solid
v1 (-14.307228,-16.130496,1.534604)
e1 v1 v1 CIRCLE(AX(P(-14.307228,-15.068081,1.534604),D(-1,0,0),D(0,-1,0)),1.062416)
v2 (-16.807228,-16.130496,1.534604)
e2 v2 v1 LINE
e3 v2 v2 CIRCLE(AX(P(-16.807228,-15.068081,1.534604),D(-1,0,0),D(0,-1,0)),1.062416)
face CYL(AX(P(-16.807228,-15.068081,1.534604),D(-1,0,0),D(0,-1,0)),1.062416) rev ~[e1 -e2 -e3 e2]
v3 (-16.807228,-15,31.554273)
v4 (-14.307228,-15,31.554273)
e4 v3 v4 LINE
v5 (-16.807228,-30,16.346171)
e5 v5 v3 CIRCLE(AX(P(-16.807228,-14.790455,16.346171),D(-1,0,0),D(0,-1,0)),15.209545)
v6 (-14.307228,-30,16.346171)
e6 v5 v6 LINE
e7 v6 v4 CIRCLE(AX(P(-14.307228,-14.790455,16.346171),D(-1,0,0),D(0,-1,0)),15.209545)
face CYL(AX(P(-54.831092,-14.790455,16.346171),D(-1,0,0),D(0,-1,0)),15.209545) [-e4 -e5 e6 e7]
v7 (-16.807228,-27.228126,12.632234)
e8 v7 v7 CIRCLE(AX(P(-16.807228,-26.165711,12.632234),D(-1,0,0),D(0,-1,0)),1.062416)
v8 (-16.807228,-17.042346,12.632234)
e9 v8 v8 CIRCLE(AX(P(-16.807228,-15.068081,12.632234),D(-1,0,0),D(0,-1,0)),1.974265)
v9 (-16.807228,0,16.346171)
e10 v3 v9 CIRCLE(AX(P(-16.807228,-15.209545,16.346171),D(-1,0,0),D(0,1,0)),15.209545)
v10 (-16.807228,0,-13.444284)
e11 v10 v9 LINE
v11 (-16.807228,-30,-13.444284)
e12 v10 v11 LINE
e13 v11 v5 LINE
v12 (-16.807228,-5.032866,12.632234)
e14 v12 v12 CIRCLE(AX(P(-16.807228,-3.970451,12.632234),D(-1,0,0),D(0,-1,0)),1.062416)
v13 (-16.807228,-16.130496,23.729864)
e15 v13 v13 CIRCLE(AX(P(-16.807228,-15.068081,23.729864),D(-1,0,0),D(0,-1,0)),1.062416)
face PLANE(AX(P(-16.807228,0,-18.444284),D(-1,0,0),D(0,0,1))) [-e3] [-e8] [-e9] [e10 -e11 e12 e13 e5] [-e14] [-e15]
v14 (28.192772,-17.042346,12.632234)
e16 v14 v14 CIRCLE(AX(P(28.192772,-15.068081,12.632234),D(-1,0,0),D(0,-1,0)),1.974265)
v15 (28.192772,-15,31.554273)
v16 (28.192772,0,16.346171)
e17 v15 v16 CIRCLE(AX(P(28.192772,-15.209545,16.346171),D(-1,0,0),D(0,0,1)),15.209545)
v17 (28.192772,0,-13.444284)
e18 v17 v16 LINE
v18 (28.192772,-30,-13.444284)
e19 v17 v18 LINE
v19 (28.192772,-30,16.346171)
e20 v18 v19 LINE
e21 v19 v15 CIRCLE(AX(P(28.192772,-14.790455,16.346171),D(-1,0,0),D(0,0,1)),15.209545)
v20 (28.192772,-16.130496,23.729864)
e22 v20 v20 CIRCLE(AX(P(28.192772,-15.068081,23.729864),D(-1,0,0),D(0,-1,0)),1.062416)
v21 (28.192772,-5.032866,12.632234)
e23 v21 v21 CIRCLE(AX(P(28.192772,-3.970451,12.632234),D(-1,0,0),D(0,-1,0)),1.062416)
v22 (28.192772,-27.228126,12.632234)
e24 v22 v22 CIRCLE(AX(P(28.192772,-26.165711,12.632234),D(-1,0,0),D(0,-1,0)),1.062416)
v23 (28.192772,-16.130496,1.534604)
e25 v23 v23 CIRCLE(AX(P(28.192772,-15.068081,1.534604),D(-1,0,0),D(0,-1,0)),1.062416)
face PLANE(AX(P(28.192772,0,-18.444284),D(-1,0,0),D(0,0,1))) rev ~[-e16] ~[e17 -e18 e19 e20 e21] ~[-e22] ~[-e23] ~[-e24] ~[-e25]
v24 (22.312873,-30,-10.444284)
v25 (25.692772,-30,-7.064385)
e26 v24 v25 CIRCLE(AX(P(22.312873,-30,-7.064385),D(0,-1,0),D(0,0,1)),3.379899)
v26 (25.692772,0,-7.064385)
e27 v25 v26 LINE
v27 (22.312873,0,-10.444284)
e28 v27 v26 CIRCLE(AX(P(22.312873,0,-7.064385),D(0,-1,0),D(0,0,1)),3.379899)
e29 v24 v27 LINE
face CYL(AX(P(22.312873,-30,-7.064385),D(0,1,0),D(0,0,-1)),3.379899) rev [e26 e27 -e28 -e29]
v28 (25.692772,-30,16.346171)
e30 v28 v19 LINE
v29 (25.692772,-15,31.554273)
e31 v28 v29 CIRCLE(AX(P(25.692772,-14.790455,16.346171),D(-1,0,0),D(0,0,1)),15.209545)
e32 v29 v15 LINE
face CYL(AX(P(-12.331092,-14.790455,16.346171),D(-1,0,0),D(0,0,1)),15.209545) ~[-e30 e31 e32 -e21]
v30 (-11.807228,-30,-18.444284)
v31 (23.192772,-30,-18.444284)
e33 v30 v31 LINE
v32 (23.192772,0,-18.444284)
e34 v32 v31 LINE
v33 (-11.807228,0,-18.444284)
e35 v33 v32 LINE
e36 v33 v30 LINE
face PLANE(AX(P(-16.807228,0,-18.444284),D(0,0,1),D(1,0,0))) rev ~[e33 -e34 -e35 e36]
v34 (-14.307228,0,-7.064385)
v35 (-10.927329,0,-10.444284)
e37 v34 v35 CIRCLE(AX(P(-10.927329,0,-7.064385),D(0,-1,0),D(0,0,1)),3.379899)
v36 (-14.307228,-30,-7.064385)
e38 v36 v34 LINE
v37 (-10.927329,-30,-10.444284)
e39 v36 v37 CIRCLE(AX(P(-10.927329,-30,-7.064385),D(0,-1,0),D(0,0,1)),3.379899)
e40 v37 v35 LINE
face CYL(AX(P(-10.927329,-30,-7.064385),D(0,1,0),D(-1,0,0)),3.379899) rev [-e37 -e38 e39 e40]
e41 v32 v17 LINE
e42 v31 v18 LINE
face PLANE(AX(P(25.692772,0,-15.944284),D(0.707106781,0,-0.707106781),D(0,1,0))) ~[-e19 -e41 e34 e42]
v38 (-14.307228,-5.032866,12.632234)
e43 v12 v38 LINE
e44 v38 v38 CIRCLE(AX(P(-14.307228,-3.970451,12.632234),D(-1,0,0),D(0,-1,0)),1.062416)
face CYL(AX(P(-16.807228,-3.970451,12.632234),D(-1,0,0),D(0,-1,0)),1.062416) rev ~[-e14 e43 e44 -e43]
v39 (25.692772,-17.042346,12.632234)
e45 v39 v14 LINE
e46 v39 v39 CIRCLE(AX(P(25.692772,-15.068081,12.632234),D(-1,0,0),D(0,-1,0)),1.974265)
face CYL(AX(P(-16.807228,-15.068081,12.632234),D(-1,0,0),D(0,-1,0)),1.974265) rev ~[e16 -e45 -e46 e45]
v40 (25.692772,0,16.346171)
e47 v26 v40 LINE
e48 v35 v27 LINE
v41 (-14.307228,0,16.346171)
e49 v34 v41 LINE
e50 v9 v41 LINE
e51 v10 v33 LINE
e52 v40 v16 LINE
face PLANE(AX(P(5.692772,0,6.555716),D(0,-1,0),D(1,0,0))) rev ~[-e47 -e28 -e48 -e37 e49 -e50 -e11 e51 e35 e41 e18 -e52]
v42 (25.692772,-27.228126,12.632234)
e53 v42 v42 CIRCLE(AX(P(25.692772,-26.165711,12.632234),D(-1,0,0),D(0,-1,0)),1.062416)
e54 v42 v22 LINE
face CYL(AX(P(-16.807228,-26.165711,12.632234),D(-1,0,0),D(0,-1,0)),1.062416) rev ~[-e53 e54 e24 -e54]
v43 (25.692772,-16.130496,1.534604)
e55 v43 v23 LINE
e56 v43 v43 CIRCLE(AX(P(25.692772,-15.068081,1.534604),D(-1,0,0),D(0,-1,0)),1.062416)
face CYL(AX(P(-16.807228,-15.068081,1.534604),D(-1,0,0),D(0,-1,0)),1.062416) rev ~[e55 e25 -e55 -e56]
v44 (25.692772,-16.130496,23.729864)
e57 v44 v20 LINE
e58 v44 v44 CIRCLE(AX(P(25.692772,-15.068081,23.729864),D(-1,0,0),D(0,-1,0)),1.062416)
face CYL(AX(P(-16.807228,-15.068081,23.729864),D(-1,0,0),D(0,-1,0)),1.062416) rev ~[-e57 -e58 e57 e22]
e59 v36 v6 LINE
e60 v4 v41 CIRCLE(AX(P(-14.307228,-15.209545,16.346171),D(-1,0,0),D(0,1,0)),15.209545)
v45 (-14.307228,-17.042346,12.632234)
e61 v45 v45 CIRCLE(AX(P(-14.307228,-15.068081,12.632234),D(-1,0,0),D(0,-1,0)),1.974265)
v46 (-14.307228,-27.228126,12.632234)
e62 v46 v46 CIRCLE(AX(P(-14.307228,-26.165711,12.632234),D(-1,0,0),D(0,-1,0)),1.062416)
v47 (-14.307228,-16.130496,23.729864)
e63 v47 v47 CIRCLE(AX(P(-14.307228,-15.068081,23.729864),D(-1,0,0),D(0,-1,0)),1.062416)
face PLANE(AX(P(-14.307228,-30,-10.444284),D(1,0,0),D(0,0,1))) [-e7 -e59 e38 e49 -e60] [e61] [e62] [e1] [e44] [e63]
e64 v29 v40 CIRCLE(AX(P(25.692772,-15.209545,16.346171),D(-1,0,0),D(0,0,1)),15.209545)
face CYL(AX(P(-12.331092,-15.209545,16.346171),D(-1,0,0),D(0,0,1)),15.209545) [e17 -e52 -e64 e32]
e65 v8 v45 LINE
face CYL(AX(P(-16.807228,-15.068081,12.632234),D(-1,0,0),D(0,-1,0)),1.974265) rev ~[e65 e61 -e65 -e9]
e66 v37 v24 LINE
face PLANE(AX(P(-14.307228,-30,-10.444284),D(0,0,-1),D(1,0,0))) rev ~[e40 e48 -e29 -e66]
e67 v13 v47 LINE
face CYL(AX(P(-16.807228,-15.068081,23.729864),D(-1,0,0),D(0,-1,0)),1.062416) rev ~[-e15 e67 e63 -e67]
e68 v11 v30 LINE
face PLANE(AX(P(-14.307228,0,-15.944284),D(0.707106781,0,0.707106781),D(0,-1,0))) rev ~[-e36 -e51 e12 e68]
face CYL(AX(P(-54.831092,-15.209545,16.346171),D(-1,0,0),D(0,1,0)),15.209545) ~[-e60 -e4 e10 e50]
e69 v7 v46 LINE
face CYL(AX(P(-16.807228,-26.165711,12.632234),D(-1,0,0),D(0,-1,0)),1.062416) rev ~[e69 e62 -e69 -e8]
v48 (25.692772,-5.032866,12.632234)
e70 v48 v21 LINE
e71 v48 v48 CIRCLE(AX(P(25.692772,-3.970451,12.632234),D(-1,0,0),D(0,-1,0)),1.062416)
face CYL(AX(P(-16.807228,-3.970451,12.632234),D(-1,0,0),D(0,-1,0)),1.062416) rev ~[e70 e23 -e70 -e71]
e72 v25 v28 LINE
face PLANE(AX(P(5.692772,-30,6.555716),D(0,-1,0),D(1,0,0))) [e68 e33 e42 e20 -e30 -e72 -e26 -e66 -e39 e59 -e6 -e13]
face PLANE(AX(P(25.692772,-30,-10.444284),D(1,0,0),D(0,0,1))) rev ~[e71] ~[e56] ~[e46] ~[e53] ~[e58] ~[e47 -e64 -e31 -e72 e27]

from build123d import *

# Parameters (mm, degrees)
F0_W        = 45
F0_H        = 50
F1_DEPTH    = 30
F2_W        = 40
F2_H        = 42
F3_DEPTH    = 30.001
F4_T1_DEPTH = 78.5477272148
F4_T3_DEPTH = 78.5477272148
F5_R        = 3.3798989873
F6_SIZE     = 5
F7_R        = 1.0624158
F7_R_2      = 1.974265
F8_DEPTH    = 45.001


# Not quite as in the source:
# - a fillet or chamfer that OpenCascade refuses, or shapes differently, is made with other operations: its cross-section is extruded or revolved along the edge and cut away or added


with BuildPart() as f1:
    # F0 (on Front) → F1 (new body)
    with BuildSketch(Plane.XZ):
        with Locations((5.6927716359, 6.5557161967)):
            Rectangle(F0_W, F0_H)
    extrude(amount=F1_DEPTH)

    # F2 (on face) → F3 (cut, through all)
    with BuildSketch(Plane.XZ.offset(30)):
        with Locations((5.6927716359, 10.5557161967)):
            Rectangle(F2_W, F2_H)
    extrude(amount=-F3_DEPTH, mode=Mode.SUBTRACT)

    # F4: fillet of radius 15.209545443 on 4 edges, made by hand

    # F4_s2 → F4_t1 (cut)
    with BuildSketch(Plane.YZ.offset(-54.8310919714)):
        with BuildLine():
            ThreePointArc((0, 16.3461707538), (-4.4547727215, 27.1009434752), (-15.209545443, 31.5557161967))
            Line((-15.209545443, 31.5557161967), (0, 31.5557161967))
            Line((0, 31.5557161967), (0, 16.3461707538))
        make_face()
        with BuildLine():
            ThreePointArc((-30, 16.3461707538), (-25.5452272785, 27.1009434752), (-14.790454557, 31.5557161967))
            Line((-14.790454557, 31.5557161967), (-30, 31.5557161967))
            Line((-30, 31.5557161967), (-30, 16.3461707538))
        make_face()
    extrude(amount=F4_T1_DEPTH, mode=Mode.SUBTRACT)

    # F4_s4 → F4_t3 (cut)
    with BuildSketch(Plane.YZ.offset(-12.3310919714)):
        with BuildLine():
            ThreePointArc((-14.790454557, 31.5557161967), (-25.5452272785, 27.1009434752), (-30, 16.3461707538))
            Line((-30, 16.3461707538), (-30, 31.5557161967))
            Line((-30, 31.5557161967), (-14.790454557, 31.5557161967))
        make_face()
        with BuildLine():
            ThreePointArc((-15.209545443, 31.5557161967), (-4.4547727215, 27.1009434752), (0, 16.3461707538))
            Line((0, 16.3461707538), (0, 31.5557161967))
            Line((0, 31.5557161967), (-15.209545443, 31.5557161967))
        make_face()
    extrude(amount=F4_T3_DEPTH, mode=Mode.SUBTRACT)

    # F5
    f5_edges = [f1.edges().sort_by_distance(p)[0] for p in [
        (-14.307228, -15, -10.444284),
        (25.692772, -15, -10.444284),
    ]]
    fillet(f5_edges, radius=F5_R)

    # F6
    f6_edges = [f1.edges().sort_by_distance(p)[0] for p in [
        (-16.807228, -15, -18.444284),
        (28.192772, -15, -18.444284),
    ]]
    chamfer(f6_edges, length=F6_SIZE)

    # F7 (on face) → F8 (cut, through all)
    with BuildSketch(Plane(origin=(-16.8072283641, 0, 0), x_dir=(0, -1, 0), z_dir=(-1, 0, 0))):
        with Locations((3.9704506522, 12.6322340244)):
            Circle(F7_R)
        with Locations((15.0680806522, 23.7298640244)):
            Circle(F7_R)
        with Locations((26.1657106522, 12.6322340244)):
            Circle(F7_R)
        with Locations((15.0680806522, 1.5346040244)):
            Circle(F7_R)
        with Locations((15.0680806522, 12.6322340244)):
            Circle(F7_R_2)
    extrude(amount=-F8_DEPTH, mode=Mode.SUBTRACT)


solid = f1.part
